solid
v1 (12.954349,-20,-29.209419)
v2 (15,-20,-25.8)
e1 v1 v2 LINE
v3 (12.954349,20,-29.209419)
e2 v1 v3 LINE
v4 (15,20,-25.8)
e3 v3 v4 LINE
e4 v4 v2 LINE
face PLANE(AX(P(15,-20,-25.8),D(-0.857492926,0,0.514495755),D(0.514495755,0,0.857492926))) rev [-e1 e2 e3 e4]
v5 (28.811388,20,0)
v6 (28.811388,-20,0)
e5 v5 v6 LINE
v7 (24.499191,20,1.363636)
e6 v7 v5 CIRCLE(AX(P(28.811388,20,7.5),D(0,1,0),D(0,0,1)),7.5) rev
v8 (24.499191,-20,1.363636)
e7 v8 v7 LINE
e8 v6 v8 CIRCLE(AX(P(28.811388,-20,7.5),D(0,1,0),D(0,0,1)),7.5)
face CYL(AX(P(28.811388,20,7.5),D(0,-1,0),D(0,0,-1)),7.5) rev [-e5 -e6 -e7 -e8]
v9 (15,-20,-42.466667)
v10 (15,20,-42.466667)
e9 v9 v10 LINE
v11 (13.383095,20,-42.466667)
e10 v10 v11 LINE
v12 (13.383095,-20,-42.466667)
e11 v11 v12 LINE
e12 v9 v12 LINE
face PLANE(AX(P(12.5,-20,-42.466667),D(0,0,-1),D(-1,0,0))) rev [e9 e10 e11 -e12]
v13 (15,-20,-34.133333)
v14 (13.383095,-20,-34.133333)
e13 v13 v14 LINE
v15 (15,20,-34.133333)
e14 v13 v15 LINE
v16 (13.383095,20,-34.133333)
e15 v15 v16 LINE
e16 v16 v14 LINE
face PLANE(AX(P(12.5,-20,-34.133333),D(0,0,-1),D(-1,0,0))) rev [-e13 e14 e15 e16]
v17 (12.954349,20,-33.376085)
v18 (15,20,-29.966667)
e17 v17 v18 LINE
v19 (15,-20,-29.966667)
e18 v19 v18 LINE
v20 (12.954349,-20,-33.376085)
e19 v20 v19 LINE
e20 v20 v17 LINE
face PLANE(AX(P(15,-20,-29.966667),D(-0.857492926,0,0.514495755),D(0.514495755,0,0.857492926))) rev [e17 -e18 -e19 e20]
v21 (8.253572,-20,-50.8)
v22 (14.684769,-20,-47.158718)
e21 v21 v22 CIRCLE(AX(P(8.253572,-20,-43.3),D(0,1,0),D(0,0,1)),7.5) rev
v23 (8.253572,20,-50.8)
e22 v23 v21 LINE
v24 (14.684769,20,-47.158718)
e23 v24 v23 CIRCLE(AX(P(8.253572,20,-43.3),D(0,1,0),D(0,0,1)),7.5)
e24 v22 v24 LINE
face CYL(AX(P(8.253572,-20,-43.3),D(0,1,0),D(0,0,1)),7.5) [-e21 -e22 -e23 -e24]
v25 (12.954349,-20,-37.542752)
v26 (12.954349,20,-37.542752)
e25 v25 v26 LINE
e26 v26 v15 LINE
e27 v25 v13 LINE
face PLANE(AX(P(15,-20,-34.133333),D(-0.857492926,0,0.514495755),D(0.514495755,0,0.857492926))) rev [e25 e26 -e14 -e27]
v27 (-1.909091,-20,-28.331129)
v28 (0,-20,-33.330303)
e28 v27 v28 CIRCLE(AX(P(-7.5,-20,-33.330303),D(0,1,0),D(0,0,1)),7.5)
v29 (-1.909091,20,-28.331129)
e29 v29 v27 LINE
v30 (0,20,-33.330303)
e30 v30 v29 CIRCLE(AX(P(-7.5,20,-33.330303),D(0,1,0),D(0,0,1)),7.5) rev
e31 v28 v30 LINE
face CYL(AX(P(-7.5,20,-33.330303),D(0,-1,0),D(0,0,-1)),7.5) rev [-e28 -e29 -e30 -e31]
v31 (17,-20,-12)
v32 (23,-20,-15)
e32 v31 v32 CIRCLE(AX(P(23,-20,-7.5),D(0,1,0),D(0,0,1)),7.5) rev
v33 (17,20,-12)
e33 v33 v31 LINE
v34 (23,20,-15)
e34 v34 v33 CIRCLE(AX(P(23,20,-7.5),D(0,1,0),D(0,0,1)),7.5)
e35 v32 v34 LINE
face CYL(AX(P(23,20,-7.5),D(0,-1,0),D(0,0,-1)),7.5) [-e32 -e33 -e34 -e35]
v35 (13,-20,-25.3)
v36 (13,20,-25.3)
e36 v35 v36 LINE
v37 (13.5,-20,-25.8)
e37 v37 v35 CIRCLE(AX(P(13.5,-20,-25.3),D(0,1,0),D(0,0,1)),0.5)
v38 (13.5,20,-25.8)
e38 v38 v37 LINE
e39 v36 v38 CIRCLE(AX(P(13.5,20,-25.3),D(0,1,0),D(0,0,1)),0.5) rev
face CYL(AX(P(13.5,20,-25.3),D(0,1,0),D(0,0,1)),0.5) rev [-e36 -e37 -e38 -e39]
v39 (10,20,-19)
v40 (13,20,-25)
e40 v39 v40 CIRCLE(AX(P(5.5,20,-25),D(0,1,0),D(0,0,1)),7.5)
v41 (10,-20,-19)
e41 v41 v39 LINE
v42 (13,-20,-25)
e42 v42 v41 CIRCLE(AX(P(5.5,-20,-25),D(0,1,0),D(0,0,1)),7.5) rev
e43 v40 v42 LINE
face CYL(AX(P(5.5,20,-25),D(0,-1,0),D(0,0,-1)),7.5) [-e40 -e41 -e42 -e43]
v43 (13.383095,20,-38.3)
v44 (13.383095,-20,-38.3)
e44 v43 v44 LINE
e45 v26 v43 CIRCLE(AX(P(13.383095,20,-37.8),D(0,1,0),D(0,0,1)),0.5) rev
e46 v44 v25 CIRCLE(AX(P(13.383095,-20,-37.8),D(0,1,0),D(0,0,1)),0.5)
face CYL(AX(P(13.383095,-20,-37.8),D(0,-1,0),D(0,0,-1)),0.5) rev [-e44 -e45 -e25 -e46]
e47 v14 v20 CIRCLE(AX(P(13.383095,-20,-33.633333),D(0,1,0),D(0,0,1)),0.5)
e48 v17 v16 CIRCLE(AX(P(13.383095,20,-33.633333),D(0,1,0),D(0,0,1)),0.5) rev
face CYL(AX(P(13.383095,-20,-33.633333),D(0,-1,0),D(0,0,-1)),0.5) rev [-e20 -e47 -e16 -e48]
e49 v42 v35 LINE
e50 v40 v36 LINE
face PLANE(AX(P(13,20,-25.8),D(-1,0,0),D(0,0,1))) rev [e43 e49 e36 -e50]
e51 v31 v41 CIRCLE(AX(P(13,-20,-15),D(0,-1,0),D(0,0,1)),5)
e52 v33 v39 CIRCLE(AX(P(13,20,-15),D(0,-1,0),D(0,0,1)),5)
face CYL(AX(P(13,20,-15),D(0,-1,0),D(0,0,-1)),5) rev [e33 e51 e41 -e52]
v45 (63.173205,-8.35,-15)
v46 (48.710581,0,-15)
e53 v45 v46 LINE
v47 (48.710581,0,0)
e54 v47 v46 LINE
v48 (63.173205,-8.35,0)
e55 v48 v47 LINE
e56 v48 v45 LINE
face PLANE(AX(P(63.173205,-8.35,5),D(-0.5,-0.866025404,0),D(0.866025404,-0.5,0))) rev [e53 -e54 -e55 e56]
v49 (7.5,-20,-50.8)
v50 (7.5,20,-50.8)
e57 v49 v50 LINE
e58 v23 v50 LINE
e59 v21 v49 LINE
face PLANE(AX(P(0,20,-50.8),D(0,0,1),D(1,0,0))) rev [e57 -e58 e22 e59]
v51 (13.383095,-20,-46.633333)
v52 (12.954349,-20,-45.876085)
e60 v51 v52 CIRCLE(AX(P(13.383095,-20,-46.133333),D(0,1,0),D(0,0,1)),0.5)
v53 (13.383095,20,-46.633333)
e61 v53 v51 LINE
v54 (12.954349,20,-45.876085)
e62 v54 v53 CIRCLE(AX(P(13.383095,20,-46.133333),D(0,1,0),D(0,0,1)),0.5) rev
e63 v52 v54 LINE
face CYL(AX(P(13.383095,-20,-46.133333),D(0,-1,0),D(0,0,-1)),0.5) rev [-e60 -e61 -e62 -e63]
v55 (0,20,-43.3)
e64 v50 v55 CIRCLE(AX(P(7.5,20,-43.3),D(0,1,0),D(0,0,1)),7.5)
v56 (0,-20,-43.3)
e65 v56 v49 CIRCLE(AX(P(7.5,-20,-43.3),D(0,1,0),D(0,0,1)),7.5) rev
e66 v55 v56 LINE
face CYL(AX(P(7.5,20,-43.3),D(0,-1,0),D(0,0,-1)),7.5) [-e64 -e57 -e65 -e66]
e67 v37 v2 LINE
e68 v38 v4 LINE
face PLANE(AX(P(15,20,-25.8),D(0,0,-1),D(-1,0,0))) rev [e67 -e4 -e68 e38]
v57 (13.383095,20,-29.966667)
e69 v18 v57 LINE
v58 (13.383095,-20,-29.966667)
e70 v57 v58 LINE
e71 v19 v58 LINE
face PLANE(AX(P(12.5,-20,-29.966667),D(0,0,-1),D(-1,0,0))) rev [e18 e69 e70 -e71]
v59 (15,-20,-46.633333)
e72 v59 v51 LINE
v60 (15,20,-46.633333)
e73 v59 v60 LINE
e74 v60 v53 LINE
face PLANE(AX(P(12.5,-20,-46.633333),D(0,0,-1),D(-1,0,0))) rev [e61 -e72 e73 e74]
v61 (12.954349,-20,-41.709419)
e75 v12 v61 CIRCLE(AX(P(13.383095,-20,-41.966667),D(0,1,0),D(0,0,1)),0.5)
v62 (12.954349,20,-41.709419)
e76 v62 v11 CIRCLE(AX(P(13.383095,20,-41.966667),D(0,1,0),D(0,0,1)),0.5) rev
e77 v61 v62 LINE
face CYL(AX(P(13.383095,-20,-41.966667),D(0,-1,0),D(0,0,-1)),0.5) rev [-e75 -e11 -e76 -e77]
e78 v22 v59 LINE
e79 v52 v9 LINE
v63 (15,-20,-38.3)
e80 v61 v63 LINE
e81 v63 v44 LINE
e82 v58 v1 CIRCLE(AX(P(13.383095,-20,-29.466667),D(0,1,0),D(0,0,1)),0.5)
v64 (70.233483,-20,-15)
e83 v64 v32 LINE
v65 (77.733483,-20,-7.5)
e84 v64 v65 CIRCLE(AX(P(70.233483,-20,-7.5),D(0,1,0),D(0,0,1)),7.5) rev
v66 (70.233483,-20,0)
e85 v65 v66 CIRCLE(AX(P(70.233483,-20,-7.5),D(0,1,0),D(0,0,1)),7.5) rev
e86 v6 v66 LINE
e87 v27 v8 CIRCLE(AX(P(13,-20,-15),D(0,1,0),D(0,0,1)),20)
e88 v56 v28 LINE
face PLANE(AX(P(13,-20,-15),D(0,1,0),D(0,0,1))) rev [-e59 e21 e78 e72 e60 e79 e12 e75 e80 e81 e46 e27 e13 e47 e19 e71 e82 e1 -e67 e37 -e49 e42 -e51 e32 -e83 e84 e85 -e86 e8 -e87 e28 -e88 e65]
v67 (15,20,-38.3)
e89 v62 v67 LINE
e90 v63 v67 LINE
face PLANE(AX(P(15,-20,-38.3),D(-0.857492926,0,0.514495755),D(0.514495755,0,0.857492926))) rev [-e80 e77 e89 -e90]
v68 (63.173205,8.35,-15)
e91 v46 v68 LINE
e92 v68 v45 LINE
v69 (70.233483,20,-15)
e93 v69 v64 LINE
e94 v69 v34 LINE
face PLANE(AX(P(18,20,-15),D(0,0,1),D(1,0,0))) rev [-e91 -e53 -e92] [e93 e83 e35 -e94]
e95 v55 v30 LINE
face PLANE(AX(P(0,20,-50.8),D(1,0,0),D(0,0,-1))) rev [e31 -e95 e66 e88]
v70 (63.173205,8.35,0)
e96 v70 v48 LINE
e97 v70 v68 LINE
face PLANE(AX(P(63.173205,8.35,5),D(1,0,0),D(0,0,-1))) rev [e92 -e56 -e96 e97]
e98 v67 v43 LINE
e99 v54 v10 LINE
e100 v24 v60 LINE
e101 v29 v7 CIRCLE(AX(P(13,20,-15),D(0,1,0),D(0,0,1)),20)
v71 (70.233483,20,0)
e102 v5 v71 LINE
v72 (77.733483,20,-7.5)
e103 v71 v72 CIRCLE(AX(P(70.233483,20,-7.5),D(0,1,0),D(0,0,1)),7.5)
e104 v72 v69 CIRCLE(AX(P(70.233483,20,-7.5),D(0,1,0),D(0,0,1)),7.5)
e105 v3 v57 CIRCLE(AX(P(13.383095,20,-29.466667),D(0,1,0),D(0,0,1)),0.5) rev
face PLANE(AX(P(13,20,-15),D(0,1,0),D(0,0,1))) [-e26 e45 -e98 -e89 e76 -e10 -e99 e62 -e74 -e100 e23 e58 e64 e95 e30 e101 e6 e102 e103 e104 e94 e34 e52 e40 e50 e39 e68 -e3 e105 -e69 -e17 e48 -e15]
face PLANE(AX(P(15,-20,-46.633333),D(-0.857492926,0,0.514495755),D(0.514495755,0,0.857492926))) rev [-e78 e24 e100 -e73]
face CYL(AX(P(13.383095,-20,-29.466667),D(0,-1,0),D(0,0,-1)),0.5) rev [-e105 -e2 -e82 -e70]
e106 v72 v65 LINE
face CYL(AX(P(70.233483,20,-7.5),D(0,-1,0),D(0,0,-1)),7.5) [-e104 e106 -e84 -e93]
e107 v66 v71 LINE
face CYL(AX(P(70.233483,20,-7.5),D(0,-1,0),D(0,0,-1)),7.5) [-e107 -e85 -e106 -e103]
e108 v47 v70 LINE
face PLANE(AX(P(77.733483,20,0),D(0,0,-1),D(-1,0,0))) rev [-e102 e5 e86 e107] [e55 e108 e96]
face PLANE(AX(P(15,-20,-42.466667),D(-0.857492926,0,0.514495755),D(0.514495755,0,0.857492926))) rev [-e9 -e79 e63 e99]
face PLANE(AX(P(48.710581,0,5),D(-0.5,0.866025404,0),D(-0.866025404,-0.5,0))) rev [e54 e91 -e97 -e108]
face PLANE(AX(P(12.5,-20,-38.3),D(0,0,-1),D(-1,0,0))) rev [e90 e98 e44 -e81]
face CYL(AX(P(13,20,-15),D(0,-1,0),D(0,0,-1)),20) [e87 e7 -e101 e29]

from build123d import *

# Parameters (mm, degrees)
BOSS_EXTRUDE1_DEPTH = 20
CUT_EXTRUDE1_DEPTH  = 88.887054459
CUT_EXTRUDE2_DEPTH  = 102.109516572
LPATTERN1_COUNT     = 6
LPATTERN1_PITCH     = 4.166666667
FILLET1_R           = 0.5
FILLET2_R           = 7.5


with BuildPart() as part:
    # Sketch1 → Boss-Extrude1 (new, symmetric)
    with BuildSketch(Plane(origin=(0, 0, 0), x_dir=(1, 0, 0), z_dir=(0, 1, 0))):
        with BuildLine():
            Line((0, 50.8), (15, 50.8))
            Line((15, 50.8), (15, 25.8))
            Line((15, 25.8), (13, 25.8))
            Line((13, 25.8), (13, 20))
            ThreePointArc((13, 20), (9.464466094, 11.464466094), (18, 15))
            Line((18, 15), (77.733482757, 15))
            Line((77.733482757, 15), (77.733482757, 0))
            Line((77.733482757, 0), (26.228756555, 0))
            ThreePointArc((26.228756555, 0), (-2.099775281, 1.885245467), (0, 30.198684154))
            Line((0, 30.198684154), (0, 50.8))
        make_face()
    extrude(amount=BOSS_EXTRUDE1_DEPTH, both=True)

    # Sketch2 → Cut-Extrude1 (cut, through all)
    with BuildSketch(Plane(origin=(0, 0, -15), x_dir=(-1, 0, 0), z_dir=(0, 0, -1))):
        Polygon((-48.710580838, 0), (-63.173205081, 8.35), (-63.173205081, -8.35), align=None)
    extrude(amount=-CUT_EXTRUDE1_DEPTH, mode=Mode.SUBTRACT)

    # Sketch3 → Cut-Extrude2 (cut, through all)
    with BuildSketch(Plane(origin=(0, 20, 0), x_dir=(1, 0, 0), z_dir=(0, 1, 0))):
        Polygon((15, 25.8), (12.5, 29.966666667), (15, 29.966666667), align=None)
    cut_extrude2 = extrude(amount=-CUT_EXTRUDE2_DEPTH, mode=Mode.SUBTRACT)

    # LPattern1: Cut-Extrude2 ×6
    with Locations(*[(0, 0, -i * LPATTERN1_PITCH) for i in range(1, LPATTERN1_COUNT)]):
        add(cut_extrude2, mode=Mode.SUBTRACT)

    # Fillet1
    fillet1_edges = [part.edges().sort_by_distance(p)[0] for p in [
        (12.5, 0, -46.633333333),
        (13, 0, -25.8),
        (12.5, 0, -29.966666667),
        (12.5, 0, -34.133333333),
        (12.5, 0, -42.466666667),
        (12.5, 0, -38.3),
    ]]
    fillet(fillet1_edges, radius=FILLET1_R)

    # Fillet2
    fillet2_edges = [part.edges().sort_by_distance(p)[0] for p in [
        (12.5, 0, -50.8),
        (77.733482757, 0, -15),
        (77.733482757, 0, 0),
        (26.228756555, 0, 0),
        (0, 0, -30.198684154),
        (0, 0, -50.8),
        (13, 0, -20),
        (18, 0, -15),
    ]]
    fillet(fillet2_edges, radius=FILLET2_R - 0.0001)  # a hair under: the kernel refuses the full size


solid = part.part
